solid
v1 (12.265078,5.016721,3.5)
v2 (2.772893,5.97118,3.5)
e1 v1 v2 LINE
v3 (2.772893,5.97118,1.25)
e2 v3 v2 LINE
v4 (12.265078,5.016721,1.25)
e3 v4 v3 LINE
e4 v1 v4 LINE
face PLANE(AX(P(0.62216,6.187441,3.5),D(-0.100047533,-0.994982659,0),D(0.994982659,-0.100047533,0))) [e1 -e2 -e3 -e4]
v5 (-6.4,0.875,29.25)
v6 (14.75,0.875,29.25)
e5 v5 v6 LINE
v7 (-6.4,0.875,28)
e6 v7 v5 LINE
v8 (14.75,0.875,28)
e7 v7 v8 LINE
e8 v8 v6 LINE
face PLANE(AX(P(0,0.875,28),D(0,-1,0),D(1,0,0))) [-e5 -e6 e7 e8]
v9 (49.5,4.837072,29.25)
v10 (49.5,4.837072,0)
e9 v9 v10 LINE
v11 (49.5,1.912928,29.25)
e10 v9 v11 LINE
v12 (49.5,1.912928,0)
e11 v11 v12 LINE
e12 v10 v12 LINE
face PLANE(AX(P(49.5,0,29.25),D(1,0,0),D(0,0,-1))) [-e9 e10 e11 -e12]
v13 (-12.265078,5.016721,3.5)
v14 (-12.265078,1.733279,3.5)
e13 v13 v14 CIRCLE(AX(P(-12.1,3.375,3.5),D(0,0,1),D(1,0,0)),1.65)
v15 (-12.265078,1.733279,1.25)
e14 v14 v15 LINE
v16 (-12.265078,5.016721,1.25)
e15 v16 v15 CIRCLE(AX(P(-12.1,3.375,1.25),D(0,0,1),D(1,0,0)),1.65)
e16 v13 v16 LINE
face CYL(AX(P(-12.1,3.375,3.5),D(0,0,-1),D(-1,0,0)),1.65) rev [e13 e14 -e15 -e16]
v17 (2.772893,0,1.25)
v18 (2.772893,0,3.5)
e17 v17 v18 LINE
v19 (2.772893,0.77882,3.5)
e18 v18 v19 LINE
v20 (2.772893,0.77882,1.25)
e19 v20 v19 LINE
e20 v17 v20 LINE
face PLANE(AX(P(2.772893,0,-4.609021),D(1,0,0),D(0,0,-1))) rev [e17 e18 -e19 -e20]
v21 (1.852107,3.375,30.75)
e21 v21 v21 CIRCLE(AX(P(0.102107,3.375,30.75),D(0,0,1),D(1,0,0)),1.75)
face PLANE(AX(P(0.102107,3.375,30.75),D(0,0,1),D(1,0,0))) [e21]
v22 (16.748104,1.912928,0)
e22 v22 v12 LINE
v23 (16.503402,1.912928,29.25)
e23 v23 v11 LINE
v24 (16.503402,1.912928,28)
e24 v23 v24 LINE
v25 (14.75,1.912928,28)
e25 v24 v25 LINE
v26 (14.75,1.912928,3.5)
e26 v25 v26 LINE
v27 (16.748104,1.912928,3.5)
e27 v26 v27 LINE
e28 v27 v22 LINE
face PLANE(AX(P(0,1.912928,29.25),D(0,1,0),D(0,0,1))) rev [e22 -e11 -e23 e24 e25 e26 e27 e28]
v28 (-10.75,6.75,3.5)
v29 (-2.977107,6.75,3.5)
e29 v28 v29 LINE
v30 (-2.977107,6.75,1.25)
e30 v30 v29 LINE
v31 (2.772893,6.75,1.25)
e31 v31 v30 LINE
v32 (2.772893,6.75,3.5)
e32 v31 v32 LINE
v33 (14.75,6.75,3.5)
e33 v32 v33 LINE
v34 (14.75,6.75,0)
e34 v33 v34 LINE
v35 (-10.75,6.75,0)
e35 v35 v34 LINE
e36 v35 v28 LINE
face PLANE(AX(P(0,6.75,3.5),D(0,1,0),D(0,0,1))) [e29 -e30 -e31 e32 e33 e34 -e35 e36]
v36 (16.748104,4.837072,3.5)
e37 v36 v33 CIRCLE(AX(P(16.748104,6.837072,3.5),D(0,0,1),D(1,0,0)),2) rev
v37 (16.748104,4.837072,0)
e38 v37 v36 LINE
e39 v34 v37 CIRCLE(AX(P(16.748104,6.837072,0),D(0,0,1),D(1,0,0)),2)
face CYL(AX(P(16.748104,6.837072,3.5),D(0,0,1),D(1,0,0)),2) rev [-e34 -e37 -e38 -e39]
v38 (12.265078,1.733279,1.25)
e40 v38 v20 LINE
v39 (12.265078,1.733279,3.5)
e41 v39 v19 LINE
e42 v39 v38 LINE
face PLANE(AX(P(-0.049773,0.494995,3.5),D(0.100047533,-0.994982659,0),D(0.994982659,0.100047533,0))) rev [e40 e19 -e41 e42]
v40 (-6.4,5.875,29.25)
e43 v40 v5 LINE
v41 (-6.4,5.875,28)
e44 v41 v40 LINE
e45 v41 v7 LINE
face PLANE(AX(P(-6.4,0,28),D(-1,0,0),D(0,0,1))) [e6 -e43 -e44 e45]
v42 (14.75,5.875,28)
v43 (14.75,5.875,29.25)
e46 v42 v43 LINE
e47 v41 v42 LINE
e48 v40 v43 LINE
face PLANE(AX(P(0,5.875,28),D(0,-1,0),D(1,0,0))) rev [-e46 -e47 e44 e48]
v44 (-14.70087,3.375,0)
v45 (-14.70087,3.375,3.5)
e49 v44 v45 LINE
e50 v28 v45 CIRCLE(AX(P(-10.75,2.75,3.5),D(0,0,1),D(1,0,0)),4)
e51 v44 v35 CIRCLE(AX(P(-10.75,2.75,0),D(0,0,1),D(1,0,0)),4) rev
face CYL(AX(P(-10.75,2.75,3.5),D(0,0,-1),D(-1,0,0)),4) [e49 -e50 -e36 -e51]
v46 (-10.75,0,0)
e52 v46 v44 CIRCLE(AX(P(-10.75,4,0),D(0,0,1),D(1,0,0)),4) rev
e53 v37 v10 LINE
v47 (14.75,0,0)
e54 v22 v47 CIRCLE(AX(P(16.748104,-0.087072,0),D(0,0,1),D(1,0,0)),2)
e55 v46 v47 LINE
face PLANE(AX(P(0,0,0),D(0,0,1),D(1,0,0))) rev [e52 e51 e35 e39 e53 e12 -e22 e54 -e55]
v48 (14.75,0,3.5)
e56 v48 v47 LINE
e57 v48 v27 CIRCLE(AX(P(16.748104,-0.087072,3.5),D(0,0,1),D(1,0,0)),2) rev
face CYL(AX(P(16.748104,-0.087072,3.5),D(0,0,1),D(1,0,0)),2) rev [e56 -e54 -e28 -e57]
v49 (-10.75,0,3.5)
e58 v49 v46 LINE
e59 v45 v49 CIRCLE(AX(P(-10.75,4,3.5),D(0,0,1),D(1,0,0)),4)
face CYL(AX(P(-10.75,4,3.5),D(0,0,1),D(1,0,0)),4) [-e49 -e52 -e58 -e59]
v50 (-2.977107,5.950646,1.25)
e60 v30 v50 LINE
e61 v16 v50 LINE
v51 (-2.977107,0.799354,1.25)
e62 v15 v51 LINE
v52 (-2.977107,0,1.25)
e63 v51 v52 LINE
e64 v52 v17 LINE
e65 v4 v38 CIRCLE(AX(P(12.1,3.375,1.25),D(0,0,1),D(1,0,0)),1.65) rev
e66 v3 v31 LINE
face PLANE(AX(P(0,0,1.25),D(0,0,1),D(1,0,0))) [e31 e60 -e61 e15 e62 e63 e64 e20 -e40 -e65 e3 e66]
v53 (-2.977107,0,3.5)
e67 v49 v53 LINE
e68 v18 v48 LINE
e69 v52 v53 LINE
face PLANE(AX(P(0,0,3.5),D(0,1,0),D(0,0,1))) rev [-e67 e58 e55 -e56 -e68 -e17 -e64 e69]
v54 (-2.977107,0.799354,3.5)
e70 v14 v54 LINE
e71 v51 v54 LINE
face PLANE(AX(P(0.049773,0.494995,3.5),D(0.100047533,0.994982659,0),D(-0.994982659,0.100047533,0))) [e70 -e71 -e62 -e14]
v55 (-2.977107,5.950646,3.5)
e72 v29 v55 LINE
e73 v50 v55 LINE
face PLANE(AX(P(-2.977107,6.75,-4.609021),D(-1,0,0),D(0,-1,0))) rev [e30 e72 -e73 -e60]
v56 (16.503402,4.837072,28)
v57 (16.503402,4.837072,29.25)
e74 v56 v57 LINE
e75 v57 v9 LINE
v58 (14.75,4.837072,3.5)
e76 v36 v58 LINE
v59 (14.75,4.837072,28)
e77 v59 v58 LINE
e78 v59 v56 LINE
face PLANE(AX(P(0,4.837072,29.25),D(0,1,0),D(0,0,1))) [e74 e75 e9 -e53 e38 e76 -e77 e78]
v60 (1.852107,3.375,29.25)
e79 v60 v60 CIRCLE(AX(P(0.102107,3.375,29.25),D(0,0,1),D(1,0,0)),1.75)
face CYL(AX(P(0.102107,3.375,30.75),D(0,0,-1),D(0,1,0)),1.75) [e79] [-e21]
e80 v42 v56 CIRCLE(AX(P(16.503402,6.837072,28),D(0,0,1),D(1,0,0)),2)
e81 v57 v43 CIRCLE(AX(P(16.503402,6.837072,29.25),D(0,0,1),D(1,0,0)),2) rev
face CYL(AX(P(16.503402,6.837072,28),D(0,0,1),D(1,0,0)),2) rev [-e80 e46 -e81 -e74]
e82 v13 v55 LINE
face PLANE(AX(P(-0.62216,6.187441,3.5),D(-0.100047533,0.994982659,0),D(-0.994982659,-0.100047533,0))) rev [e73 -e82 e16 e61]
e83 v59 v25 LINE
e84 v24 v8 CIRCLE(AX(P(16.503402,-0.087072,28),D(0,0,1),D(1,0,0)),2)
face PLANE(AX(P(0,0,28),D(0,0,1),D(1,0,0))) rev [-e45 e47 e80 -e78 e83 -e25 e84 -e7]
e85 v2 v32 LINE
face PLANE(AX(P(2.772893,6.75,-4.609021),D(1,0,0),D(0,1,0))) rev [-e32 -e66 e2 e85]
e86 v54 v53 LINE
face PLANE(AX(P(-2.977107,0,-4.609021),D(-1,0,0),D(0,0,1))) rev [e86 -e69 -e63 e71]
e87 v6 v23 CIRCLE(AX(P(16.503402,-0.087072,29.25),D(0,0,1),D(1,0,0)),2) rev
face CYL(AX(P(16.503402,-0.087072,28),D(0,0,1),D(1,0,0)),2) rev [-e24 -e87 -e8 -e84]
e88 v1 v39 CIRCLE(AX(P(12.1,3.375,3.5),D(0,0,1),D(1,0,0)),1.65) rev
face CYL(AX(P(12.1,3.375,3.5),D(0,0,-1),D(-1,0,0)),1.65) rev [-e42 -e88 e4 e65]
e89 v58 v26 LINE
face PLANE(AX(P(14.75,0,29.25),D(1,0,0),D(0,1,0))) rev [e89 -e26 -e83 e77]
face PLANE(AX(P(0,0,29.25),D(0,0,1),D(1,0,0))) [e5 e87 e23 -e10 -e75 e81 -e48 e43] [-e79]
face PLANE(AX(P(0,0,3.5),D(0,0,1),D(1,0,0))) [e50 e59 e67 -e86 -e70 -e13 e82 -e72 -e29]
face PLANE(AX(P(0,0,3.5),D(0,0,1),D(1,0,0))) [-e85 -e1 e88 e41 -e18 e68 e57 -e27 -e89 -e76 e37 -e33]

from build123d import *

# Parameters (mm, degrees)
SKETCH1_W            = 29.5
SKETCH1_H            = 6.75
BOSS_EXTRUDE10_DEPTH = 3.5
SKETCH1_16_R         = 0.291434634
BOSS_EXTRUDE15_DEPTH = 1.25
SKETCH1_17_W         = 34.75
SKETCH1_17_H         = 2.924143722
BOSS_EXTRUDE17_DEPTH = 29.25
SKETCH2_W            = 21.15
SKETCH2_H            = 5
BOSS_EXTRUDE18_DEPTH = 1.25
FILLET1_R            = 2
FILLET2_R            = 4
CUT_EXTRUDE1_START   = -2.25
SKETCH3_W            = 5.75
SKETCH3_H            = 1.125
CUT_EXTRUDE1_DEPTH   = 2.25
SKETCH4_R            = 1.75
BOSS_EXTRUDE19_DEPTH = 1.5


with BuildPart() as part:
    # Sketch1 → Boss-Extrude10 (new body)
    with BuildSketch(Plane.XY):
        with Locations((0, 3.375)):
            Rectangle(SKETCH1_W, SKETCH1_H)
        with BuildLine():
            Line((-12.265078429, 5.016721387), (0, 6.25))
            Line((0, 6.25), (12.265078429, 5.016721387))
            ThreePointArc((12.265078429, 5.016721387), (13.75, 3.375), (12.265078429, 1.733278613))
            Line((12.265078429, 1.733278613), (0, 0.5))
            Line((0, 0.5), (-12.265078429, 1.733278613))
            ThreePointArc((-12.265078429, 1.733278613), (-13.75, 3.375), (-12.265078429, 5.016721387))
        make_face(mode=Mode.SUBTRACT)
    extrude(amount=BOSS_EXTRUDE10_DEPTH)

    # Sketch1<16> → Boss-Extrude15 (add)
    # profile 1 of 9: a face of its own
    with BuildSketch(Plane.XY):
        with BuildLine():
            Line((-0.57238697, 6.192445325), (-12.265078429, 5.016721387))
            ThreePointArc((-12.265078429, 5.016721387), (-13.75, 3.375), (-12.265078429, 1.733278613))
            Line((-12.265078429, 1.733278613), (-0.57238697, 0.557554675))
            ThreePointArc((-0.57238697, 0.557554675), (-2.875, 3.375), (-0.57238697, 6.192445325))
        make_face()
        with Locations((-12.1, 3.375)):
            Circle(SKETCH1_16_R, mode=Mode.SUBTRACT)
        with Locations((-10.063185408, 3.375)):
            Circle(SKETCH1_16_R, mode=Mode.SUBTRACT)
        with Locations((-8.026370816, 3.375)):
            Circle(SKETCH1_16_R, mode=Mode.SUBTRACT)
    # profile 2 of 9: a face of its own
    with BuildSketch(Plane.XY):
        with Locations((-12.1, 3.375)):
            Circle(SKETCH1_16_R)
    # profile 3 of 9: a face of its own
    with BuildSketch(Plane.XY):
        with Locations((-8.026370816, 3.375)):
            Circle(SKETCH1_16_R)
    # profile 4 of 9: a face of its own
    with BuildSketch(Plane.XY):
        with Locations((-10.063185408, 3.375)):
            Circle(SKETCH1_16_R)
    # profile 5 of 9: a face of its own
    with BuildSketch(Plane.XY):
        with BuildLine():
            Line((0, 6.25), (-0.57238697, 6.192445325))
            ThreePointArc((-0.57238697, 6.192445325), (-2.875, 3.375), (-0.57238697, 0.557554675))
            Line((-0.57238697, 0.557554675), (0, 0.5))
            Line((0, 0.5), (0.57238697, 0.557554675))
            ThreePointArc((0.57238697, 0.557554675), (2.226121912, 1.555657748), (2.875, 3.375))
            ThreePointArc((2.875, 3.375), (2.226121912, 5.194342252), (0.57238697, 6.192445325))
            Line((0.57238697, 6.192445325), (0, 6.25))
        make_face()
    # profile 6 of 9: a face of its own
    with BuildSketch(Plane.XY):
        with BuildLine():
            Line((12.265078429, 5.016721387), (0.57238697, 6.192445325))
            ThreePointArc((0.57238697, 6.192445325), (2.226121912, 5.194342252), (2.875, 3.375))
            ThreePointArc((2.875, 3.375), (2.226121912, 1.555657748), (0.57238697, 0.557554675))
            Line((0.57238697, 0.557554675), (12.265078429, 1.733278613))
            ThreePointArc((12.265078429, 1.733278613), (13.75, 3.375), (12.265078429, 5.016721387))
        make_face()
        with Locations((8.026370816, 3.375)):
            Circle(SKETCH1_16_R, mode=Mode.SUBTRACT)
        with Locations((10.063185408, 3.375)):
            Circle(SKETCH1_16_R, mode=Mode.SUBTRACT)
        with Locations((12.1, 3.375)):
            Circle(SKETCH1_16_R, mode=Mode.SUBTRACT)
    # profile 7 of 9: a face of its own
    with BuildSketch(Plane.XY):
        with Locations((12.1, 3.375)):
            Circle(SKETCH1_16_R)
    # profile 8 of 9: a face of its own
    with BuildSketch(Plane.XY):
        with Locations((10.063185408, 3.375)):
            Circle(SKETCH1_16_R)
    # profile 9 of 9: a face of its own
    with BuildSketch(Plane.XY):
        with Locations((8.026370816, 3.375)):
            Circle(SKETCH1_16_R)
    extrude(amount=BOSS_EXTRUDE15_DEPTH)

    # Sketch1<17> → Boss-Extrude17 (add)
    with BuildSketch(Plane.XY):
        with Locations((32.125, 3.375)):
            Rectangle(SKETCH1_17_W, SKETCH1_17_H)
    extrude(amount=BOSS_EXTRUDE17_DEPTH)

    # Sketch2 → Boss-Extrude18 (add)
    with BuildSketch(Plane.XY.offset(29.25)):
        with Locations((4.175, 3.375)):
            Rectangle(SKETCH2_W, SKETCH2_H)
    extrude(amount=-BOSS_EXTRUDE18_DEPTH)

    # Fillet1
    # the kernel refuses this fillet: 2 mm, written as the material it adds along each edge
    with BuildSketch(Plane(origin=(14.75, 1.912928139, 0), x_dir=(0, -1, 0), z_dir=(0, 0, 1))) as fillet1_piece_1:
        with BuildLine():
            CenterArc((2, 1.998103724), FILLET1_R, 180, 87.504786267)
            Line((0, 1.998103724), (0, 0))
            Line((0, 0), (1.912928139, 0))
        make_face()
    extrude(amount=3.5)
    with BuildSketch(Plane(origin=(14.75, 4.837071861, 0), x_dir=(1, 0, 0), z_dir=(0, 0, 1))) as fillet1_piece_2:
        with BuildLine():
            CenterArc((1.998103724, 2), FILLET1_R, 182.495213733, 87.504786267)
            Line((0, 1.912928139), (0, 0))
            Line((0, 0), (1.998103724, 0))
        make_face()
    extrude(amount=3.5)
    with BuildSketch(Plane(origin=(14.75, 4.837071861, 28), x_dir=(1, 0, 0), z_dir=(0, 0, 1))) as fillet1_piece_3:
        with BuildLine():
            CenterArc((1.753401761, 2), FILLET1_R, 208.753082152, 61.246917848)
            Line((0, 1.037928139), (0, 0))
            Line((0, 0), (1.753401761, 0))
        make_face()
    extrude(amount=1.25)
    with BuildSketch(Plane(origin=(14.75, 1.912928139, 28), x_dir=(1, 0, 0), z_dir=(0, 0, 1))) as fillet1_piece_4:
        with BuildLine():
            CenterArc((1.753401761, -2), FILLET1_R, 90, 61.246917848)
            Line((0, -1.037928139), (0, 0))
            Line((0, 0), (1.753401761, 0))
        make_face()
    extrude(amount=1.25)

    # Fillet2
    # the kernel refuses this fillet: 4 mm, written as the material it takes off along each edge
    with BuildSketch(Plane(origin=(-14.75, 6.75, -10), x_dir=(0, -1, 0), z_dir=(0, 0, 1)), Plane(origin=(-14.75, 0, -10), x_dir=(1, 0, 0), z_dir=(0, 0, 1))) as fillet2_piece_1:
        with BuildLine():
            CenterArc((FILLET2_R, FILLET2_R), FILLET2_R, 180, 90)
            Line((0, FILLET2_R), (0, 0))
            Line((0, 0), (FILLET2_R, 0))
        make_face()
    extrude(amount=23.5, mode=Mode.SUBTRACT)

    # Sketch3 → Cut-Extrude1 (cut)
    with BuildSketch(Plane.XY.offset(3.5).offset(CUT_EXTRUDE1_START)):
        with Locations((-0.102107464, 6.1875)):
            Rectangle(SKETCH3_W, SKETCH3_H)
        with Locations((-0.102107464, 0.5625)):
            Rectangle(SKETCH3_W, SKETCH3_H)
    extrude(amount=CUT_EXTRUDE1_DEPTH, mode=Mode.SUBTRACT)

    # Sketch4 → Boss-Extrude19 (add)
    with BuildSketch(Plane.XY.offset(29.25)):
        with Locations((0.102107464, 3.375)):
            Circle(SKETCH4_R)
    extrude(amount=BOSS_EXTRUDE19_DEPTH)


solid = part.part
